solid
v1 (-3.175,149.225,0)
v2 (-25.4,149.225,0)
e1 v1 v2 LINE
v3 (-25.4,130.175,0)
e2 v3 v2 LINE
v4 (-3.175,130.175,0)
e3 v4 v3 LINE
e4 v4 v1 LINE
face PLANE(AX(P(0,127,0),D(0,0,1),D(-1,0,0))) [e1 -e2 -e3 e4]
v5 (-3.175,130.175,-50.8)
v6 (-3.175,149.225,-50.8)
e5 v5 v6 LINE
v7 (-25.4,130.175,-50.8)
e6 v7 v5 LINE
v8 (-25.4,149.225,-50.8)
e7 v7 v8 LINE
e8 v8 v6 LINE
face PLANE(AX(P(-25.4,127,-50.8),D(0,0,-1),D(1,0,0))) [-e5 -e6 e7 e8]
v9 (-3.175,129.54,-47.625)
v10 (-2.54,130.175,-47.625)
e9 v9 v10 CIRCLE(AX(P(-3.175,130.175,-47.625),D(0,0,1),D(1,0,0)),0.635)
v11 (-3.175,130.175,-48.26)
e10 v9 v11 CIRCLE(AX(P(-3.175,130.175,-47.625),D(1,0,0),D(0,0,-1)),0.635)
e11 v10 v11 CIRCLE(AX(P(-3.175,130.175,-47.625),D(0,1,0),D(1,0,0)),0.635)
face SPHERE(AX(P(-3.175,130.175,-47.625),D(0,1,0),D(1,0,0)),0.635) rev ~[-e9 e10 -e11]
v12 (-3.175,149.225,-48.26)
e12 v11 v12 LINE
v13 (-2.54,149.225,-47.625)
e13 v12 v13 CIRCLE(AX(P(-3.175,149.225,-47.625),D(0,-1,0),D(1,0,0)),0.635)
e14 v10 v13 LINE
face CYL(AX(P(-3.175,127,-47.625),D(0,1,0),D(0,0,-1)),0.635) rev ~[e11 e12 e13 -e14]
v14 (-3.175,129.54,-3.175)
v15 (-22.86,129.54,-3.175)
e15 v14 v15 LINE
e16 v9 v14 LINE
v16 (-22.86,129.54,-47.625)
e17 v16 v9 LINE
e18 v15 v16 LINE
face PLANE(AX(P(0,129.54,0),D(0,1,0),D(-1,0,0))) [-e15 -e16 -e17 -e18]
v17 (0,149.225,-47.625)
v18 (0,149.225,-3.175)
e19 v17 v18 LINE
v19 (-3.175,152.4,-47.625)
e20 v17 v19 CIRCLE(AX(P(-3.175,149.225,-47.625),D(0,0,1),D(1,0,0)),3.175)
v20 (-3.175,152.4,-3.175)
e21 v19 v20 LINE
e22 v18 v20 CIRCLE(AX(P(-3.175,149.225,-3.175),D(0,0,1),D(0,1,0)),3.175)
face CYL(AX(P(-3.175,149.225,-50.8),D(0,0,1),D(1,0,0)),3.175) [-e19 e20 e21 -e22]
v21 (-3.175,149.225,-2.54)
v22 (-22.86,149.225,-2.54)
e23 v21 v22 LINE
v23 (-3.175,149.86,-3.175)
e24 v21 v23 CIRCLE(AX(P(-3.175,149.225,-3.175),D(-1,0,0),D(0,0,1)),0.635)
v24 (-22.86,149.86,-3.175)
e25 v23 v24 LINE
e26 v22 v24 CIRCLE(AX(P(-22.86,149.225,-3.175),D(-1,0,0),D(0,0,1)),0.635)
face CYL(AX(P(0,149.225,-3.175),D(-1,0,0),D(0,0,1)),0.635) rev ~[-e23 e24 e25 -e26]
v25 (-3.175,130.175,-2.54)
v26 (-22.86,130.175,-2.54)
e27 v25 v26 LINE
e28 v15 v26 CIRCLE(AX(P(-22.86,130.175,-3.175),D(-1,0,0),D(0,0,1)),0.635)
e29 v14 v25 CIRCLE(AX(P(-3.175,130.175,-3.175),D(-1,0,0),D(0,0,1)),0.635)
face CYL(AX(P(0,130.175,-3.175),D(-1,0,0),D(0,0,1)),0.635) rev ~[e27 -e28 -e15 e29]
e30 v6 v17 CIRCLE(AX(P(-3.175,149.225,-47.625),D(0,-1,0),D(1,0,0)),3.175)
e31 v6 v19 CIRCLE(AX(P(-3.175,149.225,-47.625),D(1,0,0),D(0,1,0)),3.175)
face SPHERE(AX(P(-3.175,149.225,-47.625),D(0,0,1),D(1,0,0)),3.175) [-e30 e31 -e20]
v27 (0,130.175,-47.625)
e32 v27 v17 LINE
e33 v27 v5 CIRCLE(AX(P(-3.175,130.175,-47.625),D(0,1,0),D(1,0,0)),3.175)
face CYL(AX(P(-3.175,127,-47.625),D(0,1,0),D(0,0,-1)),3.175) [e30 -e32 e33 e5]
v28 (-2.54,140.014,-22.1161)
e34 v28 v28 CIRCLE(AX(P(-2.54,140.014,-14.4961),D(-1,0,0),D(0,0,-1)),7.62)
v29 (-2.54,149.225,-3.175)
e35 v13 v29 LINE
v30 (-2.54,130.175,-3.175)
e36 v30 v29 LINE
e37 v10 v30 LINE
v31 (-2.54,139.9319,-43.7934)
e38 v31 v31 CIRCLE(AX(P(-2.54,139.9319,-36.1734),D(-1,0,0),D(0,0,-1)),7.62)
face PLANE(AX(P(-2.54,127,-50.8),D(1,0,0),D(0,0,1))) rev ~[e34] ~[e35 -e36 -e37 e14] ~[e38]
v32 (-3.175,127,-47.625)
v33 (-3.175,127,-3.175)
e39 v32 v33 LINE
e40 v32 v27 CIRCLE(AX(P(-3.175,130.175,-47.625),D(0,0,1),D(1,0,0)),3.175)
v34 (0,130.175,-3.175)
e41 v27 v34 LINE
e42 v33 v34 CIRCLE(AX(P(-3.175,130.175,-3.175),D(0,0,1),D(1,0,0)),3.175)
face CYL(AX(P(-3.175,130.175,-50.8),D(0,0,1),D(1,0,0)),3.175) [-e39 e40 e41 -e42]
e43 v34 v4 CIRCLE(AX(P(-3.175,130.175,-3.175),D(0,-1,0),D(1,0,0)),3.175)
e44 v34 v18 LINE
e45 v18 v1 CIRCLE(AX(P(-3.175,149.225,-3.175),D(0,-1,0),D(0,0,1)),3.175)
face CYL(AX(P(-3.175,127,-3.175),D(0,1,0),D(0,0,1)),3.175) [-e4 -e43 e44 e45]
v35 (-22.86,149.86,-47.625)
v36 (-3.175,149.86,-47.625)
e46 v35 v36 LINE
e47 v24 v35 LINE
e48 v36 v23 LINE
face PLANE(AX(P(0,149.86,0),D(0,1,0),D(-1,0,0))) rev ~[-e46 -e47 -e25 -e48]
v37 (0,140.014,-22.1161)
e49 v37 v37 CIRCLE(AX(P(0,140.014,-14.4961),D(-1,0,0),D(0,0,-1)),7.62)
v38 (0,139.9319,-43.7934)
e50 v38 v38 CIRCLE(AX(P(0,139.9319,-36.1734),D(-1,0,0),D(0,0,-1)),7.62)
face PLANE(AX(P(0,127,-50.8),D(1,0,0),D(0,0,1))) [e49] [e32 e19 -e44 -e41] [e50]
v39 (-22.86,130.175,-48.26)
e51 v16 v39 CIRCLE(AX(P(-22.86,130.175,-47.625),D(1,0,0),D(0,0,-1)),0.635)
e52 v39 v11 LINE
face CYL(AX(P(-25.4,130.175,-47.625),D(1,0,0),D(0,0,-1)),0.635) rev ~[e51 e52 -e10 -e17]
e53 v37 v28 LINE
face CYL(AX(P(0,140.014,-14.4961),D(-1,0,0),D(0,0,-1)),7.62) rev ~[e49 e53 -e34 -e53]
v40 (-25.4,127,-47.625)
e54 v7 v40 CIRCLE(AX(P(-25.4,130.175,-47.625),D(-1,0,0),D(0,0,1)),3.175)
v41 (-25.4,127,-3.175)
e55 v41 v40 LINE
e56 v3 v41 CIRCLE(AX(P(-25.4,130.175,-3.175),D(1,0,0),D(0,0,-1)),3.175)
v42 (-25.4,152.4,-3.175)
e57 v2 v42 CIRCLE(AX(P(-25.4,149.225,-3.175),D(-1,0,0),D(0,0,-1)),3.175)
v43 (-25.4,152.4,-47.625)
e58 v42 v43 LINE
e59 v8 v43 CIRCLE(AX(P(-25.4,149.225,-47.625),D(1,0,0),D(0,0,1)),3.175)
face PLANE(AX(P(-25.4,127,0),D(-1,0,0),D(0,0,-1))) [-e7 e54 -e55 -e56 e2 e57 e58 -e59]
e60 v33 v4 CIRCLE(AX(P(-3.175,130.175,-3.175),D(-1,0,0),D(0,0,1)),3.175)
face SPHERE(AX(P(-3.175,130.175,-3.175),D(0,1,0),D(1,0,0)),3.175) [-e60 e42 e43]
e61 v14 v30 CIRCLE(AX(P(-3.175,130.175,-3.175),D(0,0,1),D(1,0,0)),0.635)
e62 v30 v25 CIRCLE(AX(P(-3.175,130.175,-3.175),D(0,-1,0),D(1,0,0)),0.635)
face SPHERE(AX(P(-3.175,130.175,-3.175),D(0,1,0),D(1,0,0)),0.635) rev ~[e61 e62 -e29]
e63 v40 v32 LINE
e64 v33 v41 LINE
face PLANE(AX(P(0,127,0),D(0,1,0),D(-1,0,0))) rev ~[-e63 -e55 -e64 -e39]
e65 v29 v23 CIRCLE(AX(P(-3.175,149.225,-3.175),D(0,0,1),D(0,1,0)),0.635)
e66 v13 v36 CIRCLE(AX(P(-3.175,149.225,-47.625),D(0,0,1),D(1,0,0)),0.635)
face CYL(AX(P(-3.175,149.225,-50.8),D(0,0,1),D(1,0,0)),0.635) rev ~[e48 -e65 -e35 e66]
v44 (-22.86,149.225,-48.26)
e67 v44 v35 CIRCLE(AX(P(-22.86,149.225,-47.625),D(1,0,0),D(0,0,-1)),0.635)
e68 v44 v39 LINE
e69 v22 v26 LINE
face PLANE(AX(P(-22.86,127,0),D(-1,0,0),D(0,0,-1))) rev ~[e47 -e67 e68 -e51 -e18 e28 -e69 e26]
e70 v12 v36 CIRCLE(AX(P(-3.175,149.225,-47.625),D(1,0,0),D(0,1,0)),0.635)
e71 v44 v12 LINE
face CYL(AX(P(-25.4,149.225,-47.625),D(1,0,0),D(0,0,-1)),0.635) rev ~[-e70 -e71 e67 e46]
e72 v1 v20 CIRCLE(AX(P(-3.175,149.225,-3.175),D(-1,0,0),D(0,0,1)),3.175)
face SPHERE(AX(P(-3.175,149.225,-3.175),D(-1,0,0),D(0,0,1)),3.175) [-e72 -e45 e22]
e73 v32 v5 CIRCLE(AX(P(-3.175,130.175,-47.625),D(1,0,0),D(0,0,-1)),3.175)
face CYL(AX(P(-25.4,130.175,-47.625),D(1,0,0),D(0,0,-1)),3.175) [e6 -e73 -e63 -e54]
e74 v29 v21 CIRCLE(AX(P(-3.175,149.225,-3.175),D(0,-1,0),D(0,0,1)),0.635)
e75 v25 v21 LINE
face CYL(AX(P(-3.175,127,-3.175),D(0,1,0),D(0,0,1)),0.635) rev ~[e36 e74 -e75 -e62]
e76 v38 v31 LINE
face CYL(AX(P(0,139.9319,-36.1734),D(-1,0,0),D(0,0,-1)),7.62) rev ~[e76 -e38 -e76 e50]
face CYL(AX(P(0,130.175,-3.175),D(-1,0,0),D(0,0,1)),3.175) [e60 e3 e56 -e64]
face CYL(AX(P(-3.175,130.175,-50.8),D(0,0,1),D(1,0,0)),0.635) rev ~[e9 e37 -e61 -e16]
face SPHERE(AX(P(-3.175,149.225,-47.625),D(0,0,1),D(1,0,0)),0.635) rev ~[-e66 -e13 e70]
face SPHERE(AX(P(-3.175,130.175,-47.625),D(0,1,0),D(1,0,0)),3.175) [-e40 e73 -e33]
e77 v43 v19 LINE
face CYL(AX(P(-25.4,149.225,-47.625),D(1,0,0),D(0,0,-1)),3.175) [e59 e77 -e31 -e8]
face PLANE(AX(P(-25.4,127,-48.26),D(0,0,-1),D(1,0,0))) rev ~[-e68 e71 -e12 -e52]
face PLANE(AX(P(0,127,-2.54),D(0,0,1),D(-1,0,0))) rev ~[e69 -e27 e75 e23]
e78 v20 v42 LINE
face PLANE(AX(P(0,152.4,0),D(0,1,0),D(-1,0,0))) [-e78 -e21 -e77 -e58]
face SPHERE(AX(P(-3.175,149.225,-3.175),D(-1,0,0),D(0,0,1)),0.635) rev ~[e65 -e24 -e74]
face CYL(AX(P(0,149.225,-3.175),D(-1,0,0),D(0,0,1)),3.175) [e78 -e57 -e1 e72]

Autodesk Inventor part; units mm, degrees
ref_plane "YZ Plane" through (0, 0, 0) normal (1, 0, 0) x (0, 1, 0)
ref_plane "XY Plane" through (0, 0, 0) normal (0, 0, 1) x (1, 0, 0)
ref_plane "Work Plane1" through (0, 127, 0) normal (0, 1, 0) x (-1, 0, 0)
sketch "Sketch1" plane through (0, 127, 0) normal (0, 1, 0) x (-1, 0, 0)
  line L0 (0, 0) -> (25.4, 0)
  line L1 (25.4, 0) -> (25.4, -50.8)
  line L2 (25.4, -50.8) -> (0, -50.8)
  line L3 (0, -50.8) -> (0, 0)
  dimension "d1" = 25.4
  dimension "d2" = 50.8
extrude "Extrusion1" add sketch "Sketch1" along normal blind 25.4
fillet "Fillet1" radius 3.175 8 edges at (-12.7, 152.4, 0) (0, 139.7, 0) (0, 152.4, -25.4) (0, 139.7, -50.8) (-12.7, 152.4, -50.8) (0, 127, -25.4) (-12.7, 127, 0) (-12.7, 127, -50.8)
shell "Shell1" thickness 2.54 removed faces 0
sketch "Sketch2" plane through (0, 130.175, -47.625) normal (1, 0, 0) x (0, 0, -1)
  point P0 (-47.625, -130.175)
  point P1 (-33.1289, 9.839)
  point P2 (-11.4516, 9.7569)
hole "Hole1" at (0, 139.9319, -36.1734) at (0, 140.014, -14.4961) direction (-1, 0, 0) diameter 15.24 depth 2.54
properties part number "Ultrasonic Case"
